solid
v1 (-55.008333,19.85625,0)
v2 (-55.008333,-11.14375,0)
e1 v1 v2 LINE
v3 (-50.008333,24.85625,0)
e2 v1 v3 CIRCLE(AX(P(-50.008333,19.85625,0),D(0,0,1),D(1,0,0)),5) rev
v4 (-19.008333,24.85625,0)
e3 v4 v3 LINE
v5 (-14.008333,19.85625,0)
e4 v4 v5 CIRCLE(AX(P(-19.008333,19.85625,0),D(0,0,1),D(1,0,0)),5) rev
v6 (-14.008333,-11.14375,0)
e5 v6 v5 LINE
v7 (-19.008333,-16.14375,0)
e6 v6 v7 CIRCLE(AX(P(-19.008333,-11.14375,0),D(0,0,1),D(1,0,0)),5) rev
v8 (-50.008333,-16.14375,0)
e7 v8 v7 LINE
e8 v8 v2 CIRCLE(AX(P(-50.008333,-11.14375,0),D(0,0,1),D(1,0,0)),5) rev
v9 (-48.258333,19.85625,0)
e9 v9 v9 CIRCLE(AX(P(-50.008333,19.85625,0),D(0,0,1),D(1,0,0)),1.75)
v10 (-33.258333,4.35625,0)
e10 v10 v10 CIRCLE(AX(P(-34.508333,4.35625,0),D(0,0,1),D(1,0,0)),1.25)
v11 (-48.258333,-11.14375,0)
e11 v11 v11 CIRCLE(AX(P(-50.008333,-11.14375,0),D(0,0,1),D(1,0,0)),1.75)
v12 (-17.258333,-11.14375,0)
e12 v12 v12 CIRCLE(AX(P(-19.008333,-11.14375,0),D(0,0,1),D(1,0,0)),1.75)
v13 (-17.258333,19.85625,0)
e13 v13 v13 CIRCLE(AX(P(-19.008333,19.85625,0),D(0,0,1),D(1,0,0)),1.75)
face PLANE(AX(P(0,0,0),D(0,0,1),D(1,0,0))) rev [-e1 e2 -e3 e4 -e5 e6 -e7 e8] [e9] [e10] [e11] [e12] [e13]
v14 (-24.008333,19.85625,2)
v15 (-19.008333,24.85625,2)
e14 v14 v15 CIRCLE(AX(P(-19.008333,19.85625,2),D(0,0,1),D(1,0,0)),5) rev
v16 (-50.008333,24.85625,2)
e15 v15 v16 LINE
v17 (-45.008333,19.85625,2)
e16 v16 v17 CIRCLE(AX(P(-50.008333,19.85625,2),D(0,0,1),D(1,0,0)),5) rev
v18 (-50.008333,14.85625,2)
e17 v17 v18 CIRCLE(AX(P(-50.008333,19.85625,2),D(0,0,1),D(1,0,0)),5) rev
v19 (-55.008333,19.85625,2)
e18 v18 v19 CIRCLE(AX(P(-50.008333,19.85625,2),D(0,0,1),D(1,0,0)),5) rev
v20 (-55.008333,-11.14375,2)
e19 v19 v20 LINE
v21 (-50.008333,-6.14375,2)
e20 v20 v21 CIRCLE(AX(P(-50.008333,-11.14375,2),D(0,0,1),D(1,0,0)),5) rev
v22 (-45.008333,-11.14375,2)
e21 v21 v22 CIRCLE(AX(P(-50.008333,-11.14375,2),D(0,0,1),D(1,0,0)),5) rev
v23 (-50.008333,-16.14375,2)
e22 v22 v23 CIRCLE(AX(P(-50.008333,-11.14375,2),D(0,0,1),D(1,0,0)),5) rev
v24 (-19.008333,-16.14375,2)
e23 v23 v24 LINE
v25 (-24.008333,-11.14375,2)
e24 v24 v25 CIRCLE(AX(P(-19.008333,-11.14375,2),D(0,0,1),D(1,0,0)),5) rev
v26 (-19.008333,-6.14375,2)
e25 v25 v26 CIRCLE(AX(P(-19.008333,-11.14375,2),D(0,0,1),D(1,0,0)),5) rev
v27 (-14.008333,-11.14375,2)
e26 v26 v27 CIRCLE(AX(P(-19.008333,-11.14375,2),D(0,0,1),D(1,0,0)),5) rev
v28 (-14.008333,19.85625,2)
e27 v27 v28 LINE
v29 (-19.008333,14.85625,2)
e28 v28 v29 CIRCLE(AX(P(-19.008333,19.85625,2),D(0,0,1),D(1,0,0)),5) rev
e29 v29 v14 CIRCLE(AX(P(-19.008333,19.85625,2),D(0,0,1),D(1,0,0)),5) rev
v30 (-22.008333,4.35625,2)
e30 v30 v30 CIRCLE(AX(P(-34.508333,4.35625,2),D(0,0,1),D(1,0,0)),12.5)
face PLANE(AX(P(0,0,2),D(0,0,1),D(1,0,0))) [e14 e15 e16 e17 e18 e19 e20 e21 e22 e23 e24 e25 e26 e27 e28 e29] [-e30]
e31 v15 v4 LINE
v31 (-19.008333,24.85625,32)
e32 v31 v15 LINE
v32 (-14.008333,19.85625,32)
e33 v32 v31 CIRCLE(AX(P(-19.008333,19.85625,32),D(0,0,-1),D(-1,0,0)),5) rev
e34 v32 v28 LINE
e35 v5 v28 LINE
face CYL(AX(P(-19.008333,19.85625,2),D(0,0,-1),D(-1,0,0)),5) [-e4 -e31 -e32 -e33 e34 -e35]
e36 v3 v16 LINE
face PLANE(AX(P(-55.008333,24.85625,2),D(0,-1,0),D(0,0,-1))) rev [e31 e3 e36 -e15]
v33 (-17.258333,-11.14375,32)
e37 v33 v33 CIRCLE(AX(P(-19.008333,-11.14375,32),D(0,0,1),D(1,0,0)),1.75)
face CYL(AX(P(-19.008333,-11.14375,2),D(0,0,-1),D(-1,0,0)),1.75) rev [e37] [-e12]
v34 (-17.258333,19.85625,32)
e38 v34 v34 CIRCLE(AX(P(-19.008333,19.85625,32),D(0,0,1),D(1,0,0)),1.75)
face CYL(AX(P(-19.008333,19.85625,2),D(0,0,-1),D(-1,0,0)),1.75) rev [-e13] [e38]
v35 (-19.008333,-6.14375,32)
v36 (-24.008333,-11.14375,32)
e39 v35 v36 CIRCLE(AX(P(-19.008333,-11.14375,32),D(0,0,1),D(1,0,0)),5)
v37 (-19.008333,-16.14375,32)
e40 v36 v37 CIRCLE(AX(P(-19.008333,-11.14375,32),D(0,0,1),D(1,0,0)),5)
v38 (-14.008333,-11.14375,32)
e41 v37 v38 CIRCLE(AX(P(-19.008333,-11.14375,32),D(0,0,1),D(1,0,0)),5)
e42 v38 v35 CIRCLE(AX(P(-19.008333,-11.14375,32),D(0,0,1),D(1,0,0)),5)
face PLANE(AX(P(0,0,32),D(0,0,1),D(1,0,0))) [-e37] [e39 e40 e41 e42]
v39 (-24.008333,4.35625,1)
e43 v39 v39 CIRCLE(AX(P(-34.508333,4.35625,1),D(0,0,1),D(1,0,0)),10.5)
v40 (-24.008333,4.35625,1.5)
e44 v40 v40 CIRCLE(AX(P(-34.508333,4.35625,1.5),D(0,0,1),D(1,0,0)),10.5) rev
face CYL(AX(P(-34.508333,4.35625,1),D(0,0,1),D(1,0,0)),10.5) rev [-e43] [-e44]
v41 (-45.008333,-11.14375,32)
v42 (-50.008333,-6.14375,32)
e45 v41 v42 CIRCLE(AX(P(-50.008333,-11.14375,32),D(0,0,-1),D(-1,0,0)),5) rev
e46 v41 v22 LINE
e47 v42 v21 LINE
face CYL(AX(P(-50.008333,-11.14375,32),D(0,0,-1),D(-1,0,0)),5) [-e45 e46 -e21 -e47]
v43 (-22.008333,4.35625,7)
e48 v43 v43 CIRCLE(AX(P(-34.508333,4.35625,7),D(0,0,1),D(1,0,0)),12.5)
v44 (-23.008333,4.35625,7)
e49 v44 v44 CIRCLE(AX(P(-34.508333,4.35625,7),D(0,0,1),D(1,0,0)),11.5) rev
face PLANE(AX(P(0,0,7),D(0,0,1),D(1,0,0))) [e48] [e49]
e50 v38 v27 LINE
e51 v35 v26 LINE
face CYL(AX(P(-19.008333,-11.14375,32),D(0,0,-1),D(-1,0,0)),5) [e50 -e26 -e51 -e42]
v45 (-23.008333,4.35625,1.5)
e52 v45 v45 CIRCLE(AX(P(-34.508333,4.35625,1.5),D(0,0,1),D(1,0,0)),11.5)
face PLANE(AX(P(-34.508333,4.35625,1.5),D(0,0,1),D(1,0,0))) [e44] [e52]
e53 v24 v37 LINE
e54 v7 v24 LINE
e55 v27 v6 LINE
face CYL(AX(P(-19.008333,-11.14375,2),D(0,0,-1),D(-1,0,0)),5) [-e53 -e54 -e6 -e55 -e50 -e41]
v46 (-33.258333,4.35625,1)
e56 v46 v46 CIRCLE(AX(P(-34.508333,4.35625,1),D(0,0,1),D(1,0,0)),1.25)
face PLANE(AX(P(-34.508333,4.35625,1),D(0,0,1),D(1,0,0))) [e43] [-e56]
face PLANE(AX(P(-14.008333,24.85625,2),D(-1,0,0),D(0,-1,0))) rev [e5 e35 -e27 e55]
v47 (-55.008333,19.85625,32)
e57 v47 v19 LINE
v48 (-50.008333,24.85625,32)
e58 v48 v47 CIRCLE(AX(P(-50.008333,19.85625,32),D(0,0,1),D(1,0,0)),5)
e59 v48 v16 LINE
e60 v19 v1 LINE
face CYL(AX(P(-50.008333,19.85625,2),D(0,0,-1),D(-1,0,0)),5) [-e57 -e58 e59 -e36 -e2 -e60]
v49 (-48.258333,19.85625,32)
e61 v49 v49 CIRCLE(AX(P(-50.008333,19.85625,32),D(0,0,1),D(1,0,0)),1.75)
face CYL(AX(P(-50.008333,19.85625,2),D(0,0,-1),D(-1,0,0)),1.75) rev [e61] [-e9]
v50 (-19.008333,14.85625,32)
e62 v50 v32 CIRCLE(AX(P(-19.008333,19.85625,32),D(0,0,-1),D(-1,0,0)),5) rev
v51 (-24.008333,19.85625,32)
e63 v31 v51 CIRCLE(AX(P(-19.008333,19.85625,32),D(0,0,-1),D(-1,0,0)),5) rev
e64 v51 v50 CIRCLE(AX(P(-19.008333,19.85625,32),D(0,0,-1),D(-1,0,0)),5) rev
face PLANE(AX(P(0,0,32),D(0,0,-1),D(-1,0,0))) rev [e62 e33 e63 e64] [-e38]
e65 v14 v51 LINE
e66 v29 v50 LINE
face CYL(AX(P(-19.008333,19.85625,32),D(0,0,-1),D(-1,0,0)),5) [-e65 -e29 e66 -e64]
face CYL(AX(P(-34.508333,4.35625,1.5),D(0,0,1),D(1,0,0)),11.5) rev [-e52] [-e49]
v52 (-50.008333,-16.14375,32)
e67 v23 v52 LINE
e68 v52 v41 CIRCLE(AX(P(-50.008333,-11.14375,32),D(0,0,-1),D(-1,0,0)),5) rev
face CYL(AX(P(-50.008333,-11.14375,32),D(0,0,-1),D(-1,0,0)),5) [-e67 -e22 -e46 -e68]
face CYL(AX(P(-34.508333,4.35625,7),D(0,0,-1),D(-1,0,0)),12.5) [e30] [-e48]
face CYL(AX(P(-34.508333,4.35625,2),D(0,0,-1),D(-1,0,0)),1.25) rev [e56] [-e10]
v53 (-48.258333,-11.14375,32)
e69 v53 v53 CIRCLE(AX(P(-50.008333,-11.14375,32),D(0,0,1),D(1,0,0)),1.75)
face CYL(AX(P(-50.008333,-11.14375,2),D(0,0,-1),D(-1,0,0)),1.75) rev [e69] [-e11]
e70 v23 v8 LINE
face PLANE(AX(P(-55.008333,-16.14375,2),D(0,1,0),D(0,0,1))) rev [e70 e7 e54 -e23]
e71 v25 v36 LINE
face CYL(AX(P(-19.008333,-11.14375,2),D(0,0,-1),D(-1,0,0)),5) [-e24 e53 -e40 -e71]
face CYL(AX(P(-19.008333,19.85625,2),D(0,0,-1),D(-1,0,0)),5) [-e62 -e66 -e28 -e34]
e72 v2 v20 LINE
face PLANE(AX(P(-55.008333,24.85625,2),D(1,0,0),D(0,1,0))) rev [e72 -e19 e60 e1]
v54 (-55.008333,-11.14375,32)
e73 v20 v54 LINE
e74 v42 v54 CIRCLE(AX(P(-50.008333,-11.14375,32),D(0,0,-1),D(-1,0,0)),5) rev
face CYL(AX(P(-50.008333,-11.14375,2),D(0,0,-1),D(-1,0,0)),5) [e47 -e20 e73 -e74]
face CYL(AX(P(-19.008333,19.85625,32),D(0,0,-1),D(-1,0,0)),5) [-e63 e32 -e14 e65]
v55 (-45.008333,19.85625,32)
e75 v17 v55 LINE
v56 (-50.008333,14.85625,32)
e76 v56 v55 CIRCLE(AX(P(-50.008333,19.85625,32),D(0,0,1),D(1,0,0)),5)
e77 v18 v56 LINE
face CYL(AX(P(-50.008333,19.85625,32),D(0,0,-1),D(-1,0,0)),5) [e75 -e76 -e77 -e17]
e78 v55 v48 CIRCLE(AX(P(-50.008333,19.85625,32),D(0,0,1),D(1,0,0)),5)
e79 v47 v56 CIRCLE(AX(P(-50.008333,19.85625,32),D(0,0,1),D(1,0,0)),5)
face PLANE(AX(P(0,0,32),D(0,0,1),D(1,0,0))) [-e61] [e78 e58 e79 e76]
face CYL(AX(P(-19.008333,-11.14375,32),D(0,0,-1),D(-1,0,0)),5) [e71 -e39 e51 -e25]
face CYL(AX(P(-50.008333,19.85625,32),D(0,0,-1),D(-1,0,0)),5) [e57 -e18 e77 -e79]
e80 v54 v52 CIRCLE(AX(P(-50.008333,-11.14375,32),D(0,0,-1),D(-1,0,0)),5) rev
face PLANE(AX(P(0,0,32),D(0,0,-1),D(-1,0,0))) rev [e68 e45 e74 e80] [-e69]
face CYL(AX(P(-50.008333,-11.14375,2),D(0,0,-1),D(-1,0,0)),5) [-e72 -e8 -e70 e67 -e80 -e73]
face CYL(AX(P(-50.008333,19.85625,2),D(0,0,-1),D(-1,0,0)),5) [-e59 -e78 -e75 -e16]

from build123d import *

# Parameters (mm, degrees)
SKETCH1_W           = 41
SKETCH1_H           = 41
SKETCH1_R           = 1.75
SKETCH1_R_2         = 1.25
BOSS_EXTRUDE1_DEPTH = 2
SKETCH2_W           = 10
SKETCH2_H           = 10
SKETCH2_R           = 1.75
BOSS_EXTRUDE2_DEPTH = 30
FILLET1_R           = 5
SKETCH3_R           = 10.5
CUT_EXTRUDE1_DEPTH  = 1
SKETCH4_R           = 11.5
CUT_EXTRUDE2_DEPTH  = 0.5
BOSS_EXTRUDE3_START = 5
SKETCH6_R           = 12.5
BOSS_EXTRUDE3_DEPTH = 5


with BuildPart() as part:
    # Sketch1 → Boss-Extrude1 (new body)
    with BuildSketch(Plane.XY):
        with Locations((-34.508333333, 4.35625)):
            Rectangle(SKETCH1_W, SKETCH1_H)
        with Locations((-50.008333333, 19.85625)):
            Circle(SKETCH1_R, mode=Mode.SUBTRACT)
        with Locations((-50.008333333, -11.14375)):
            Circle(SKETCH1_R, mode=Mode.SUBTRACT)
        with Locations((-19.008333333, -11.14375)):
            Circle(SKETCH1_R, mode=Mode.SUBTRACT)
        with Locations((-19.008333333, 19.85625)):
            Circle(SKETCH1_R, mode=Mode.SUBTRACT)
        with Locations((-34.508333333, 4.35625)):
            Circle(SKETCH1_R_2, mode=Mode.SUBTRACT)
    extrude(amount=BOSS_EXTRUDE1_DEPTH)

    # Sketch2 → Boss-Extrude2 (add)
    # profile 1 of 4: a face of its own
    with BuildSketch(Plane.XY.offset(2)):
        with Locations((-50.008333333, 19.85625)):
            Rectangle(SKETCH2_W, SKETCH2_H)
        with Locations((-50.008333333, 19.85625)):
            Circle(SKETCH2_R, mode=Mode.SUBTRACT)
    # profile 2 of 4: a face of its own
    with BuildSketch(Plane.XY.offset(2)):
        with Locations((-50.008333333, -11.14375)):
            Rectangle(SKETCH2_W, SKETCH2_H)
        with Locations((-50.008333333, -11.14375)):
            Circle(SKETCH2_R, mode=Mode.SUBTRACT)
    # profile 3 of 4: a face of its own
    with BuildSketch(Plane.XY.offset(2)):
        with Locations((-19.008333333, -11.14375)):
            Rectangle(SKETCH2_W, SKETCH2_H)
        with Locations((-19.008333333, -11.14375)):
            Circle(SKETCH2_R, mode=Mode.SUBTRACT)
    # profile 4 of 4: a face of its own
    with BuildSketch(Plane.XY.offset(2)):
        with Locations((-19.008333333, 19.85625)):
            Rectangle(SKETCH2_W, SKETCH2_H)
        with Locations((-19.008333333, 19.85625)):
            Circle(SKETCH2_R, mode=Mode.SUBTRACT)
    extrude(amount=BOSS_EXTRUDE2_DEPTH)

    # Fillet1
    fillet1_edges = [part.edges().sort_by_distance(p)[0] for p in [
        (-24.008333333, 24.85625, 17),
        (-24.008333333, -6.14375, 17),
        (-55.008333333, -6.14375, 17),
        (-55.008333333, 14.85625, 17),
        (-45.008333333, 24.85625, 17),
        (-45.008333333, -6.14375, 17),
        (-45.008333333, -16.14375, 17),
        (-24.008333333, -16.14375, 17),
        (-14.008333333, -6.14375, 17),
        (-14.008333333, 14.85625, 17),
        (-24.008333333, 14.85625, 17),
        (-45.008333333, 14.85625, 17),
        (-14.008333333, -16.14375, 16),
        (-14.008333333, 24.85625, 16),
        (-55.008333333, -16.14375, 16),
        (-55.008333333, 24.85625, 16),
    ]]
    fillet(fillet1_edges, radius=FILLET1_R - 0.0001)  # a hair under: the kernel refuses the full size

    # Sketch3 → Cut-Extrude1 (cut)
    with BuildSketch(Plane.XY.offset(2)):
        with Locations((-34.508333333, 4.35625)):
            Circle(SKETCH3_R)
    extrude(amount=-CUT_EXTRUDE1_DEPTH, mode=Mode.SUBTRACT)

    # Sketch4 → Cut-Extrude2 (cut)
    with BuildSketch(Plane.XY.offset(2)):
        with Locations((-34.508333333, 4.35625)):
            Circle(SKETCH4_R)
    extrude(amount=-CUT_EXTRUDE2_DEPTH, mode=Mode.SUBTRACT)

    # Sketch6 → Boss-Extrude3 (add)
    with BuildSketch(Plane.XY.offset(2).offset(BOSS_EXTRUDE3_START)):
        with Locations((-34.508333333, 4.35625)):
            Circle(SKETCH6_R)
        with BuildLine():
            ThreePointArc((-23.008333333, 4.35625), (-32.058371909, -6.879749689), (-44.964453163, -0.431187531))
            ThreePointArc((-44.964453163, -0.431187531), (-36.958294758, 15.592249689), (-23.008333333, 4.35625))
        make_face(mode=Mode.SUBTRACT)
    extrude(amount=-BOSS_EXTRUDE3_DEPTH)


solid = part.part
